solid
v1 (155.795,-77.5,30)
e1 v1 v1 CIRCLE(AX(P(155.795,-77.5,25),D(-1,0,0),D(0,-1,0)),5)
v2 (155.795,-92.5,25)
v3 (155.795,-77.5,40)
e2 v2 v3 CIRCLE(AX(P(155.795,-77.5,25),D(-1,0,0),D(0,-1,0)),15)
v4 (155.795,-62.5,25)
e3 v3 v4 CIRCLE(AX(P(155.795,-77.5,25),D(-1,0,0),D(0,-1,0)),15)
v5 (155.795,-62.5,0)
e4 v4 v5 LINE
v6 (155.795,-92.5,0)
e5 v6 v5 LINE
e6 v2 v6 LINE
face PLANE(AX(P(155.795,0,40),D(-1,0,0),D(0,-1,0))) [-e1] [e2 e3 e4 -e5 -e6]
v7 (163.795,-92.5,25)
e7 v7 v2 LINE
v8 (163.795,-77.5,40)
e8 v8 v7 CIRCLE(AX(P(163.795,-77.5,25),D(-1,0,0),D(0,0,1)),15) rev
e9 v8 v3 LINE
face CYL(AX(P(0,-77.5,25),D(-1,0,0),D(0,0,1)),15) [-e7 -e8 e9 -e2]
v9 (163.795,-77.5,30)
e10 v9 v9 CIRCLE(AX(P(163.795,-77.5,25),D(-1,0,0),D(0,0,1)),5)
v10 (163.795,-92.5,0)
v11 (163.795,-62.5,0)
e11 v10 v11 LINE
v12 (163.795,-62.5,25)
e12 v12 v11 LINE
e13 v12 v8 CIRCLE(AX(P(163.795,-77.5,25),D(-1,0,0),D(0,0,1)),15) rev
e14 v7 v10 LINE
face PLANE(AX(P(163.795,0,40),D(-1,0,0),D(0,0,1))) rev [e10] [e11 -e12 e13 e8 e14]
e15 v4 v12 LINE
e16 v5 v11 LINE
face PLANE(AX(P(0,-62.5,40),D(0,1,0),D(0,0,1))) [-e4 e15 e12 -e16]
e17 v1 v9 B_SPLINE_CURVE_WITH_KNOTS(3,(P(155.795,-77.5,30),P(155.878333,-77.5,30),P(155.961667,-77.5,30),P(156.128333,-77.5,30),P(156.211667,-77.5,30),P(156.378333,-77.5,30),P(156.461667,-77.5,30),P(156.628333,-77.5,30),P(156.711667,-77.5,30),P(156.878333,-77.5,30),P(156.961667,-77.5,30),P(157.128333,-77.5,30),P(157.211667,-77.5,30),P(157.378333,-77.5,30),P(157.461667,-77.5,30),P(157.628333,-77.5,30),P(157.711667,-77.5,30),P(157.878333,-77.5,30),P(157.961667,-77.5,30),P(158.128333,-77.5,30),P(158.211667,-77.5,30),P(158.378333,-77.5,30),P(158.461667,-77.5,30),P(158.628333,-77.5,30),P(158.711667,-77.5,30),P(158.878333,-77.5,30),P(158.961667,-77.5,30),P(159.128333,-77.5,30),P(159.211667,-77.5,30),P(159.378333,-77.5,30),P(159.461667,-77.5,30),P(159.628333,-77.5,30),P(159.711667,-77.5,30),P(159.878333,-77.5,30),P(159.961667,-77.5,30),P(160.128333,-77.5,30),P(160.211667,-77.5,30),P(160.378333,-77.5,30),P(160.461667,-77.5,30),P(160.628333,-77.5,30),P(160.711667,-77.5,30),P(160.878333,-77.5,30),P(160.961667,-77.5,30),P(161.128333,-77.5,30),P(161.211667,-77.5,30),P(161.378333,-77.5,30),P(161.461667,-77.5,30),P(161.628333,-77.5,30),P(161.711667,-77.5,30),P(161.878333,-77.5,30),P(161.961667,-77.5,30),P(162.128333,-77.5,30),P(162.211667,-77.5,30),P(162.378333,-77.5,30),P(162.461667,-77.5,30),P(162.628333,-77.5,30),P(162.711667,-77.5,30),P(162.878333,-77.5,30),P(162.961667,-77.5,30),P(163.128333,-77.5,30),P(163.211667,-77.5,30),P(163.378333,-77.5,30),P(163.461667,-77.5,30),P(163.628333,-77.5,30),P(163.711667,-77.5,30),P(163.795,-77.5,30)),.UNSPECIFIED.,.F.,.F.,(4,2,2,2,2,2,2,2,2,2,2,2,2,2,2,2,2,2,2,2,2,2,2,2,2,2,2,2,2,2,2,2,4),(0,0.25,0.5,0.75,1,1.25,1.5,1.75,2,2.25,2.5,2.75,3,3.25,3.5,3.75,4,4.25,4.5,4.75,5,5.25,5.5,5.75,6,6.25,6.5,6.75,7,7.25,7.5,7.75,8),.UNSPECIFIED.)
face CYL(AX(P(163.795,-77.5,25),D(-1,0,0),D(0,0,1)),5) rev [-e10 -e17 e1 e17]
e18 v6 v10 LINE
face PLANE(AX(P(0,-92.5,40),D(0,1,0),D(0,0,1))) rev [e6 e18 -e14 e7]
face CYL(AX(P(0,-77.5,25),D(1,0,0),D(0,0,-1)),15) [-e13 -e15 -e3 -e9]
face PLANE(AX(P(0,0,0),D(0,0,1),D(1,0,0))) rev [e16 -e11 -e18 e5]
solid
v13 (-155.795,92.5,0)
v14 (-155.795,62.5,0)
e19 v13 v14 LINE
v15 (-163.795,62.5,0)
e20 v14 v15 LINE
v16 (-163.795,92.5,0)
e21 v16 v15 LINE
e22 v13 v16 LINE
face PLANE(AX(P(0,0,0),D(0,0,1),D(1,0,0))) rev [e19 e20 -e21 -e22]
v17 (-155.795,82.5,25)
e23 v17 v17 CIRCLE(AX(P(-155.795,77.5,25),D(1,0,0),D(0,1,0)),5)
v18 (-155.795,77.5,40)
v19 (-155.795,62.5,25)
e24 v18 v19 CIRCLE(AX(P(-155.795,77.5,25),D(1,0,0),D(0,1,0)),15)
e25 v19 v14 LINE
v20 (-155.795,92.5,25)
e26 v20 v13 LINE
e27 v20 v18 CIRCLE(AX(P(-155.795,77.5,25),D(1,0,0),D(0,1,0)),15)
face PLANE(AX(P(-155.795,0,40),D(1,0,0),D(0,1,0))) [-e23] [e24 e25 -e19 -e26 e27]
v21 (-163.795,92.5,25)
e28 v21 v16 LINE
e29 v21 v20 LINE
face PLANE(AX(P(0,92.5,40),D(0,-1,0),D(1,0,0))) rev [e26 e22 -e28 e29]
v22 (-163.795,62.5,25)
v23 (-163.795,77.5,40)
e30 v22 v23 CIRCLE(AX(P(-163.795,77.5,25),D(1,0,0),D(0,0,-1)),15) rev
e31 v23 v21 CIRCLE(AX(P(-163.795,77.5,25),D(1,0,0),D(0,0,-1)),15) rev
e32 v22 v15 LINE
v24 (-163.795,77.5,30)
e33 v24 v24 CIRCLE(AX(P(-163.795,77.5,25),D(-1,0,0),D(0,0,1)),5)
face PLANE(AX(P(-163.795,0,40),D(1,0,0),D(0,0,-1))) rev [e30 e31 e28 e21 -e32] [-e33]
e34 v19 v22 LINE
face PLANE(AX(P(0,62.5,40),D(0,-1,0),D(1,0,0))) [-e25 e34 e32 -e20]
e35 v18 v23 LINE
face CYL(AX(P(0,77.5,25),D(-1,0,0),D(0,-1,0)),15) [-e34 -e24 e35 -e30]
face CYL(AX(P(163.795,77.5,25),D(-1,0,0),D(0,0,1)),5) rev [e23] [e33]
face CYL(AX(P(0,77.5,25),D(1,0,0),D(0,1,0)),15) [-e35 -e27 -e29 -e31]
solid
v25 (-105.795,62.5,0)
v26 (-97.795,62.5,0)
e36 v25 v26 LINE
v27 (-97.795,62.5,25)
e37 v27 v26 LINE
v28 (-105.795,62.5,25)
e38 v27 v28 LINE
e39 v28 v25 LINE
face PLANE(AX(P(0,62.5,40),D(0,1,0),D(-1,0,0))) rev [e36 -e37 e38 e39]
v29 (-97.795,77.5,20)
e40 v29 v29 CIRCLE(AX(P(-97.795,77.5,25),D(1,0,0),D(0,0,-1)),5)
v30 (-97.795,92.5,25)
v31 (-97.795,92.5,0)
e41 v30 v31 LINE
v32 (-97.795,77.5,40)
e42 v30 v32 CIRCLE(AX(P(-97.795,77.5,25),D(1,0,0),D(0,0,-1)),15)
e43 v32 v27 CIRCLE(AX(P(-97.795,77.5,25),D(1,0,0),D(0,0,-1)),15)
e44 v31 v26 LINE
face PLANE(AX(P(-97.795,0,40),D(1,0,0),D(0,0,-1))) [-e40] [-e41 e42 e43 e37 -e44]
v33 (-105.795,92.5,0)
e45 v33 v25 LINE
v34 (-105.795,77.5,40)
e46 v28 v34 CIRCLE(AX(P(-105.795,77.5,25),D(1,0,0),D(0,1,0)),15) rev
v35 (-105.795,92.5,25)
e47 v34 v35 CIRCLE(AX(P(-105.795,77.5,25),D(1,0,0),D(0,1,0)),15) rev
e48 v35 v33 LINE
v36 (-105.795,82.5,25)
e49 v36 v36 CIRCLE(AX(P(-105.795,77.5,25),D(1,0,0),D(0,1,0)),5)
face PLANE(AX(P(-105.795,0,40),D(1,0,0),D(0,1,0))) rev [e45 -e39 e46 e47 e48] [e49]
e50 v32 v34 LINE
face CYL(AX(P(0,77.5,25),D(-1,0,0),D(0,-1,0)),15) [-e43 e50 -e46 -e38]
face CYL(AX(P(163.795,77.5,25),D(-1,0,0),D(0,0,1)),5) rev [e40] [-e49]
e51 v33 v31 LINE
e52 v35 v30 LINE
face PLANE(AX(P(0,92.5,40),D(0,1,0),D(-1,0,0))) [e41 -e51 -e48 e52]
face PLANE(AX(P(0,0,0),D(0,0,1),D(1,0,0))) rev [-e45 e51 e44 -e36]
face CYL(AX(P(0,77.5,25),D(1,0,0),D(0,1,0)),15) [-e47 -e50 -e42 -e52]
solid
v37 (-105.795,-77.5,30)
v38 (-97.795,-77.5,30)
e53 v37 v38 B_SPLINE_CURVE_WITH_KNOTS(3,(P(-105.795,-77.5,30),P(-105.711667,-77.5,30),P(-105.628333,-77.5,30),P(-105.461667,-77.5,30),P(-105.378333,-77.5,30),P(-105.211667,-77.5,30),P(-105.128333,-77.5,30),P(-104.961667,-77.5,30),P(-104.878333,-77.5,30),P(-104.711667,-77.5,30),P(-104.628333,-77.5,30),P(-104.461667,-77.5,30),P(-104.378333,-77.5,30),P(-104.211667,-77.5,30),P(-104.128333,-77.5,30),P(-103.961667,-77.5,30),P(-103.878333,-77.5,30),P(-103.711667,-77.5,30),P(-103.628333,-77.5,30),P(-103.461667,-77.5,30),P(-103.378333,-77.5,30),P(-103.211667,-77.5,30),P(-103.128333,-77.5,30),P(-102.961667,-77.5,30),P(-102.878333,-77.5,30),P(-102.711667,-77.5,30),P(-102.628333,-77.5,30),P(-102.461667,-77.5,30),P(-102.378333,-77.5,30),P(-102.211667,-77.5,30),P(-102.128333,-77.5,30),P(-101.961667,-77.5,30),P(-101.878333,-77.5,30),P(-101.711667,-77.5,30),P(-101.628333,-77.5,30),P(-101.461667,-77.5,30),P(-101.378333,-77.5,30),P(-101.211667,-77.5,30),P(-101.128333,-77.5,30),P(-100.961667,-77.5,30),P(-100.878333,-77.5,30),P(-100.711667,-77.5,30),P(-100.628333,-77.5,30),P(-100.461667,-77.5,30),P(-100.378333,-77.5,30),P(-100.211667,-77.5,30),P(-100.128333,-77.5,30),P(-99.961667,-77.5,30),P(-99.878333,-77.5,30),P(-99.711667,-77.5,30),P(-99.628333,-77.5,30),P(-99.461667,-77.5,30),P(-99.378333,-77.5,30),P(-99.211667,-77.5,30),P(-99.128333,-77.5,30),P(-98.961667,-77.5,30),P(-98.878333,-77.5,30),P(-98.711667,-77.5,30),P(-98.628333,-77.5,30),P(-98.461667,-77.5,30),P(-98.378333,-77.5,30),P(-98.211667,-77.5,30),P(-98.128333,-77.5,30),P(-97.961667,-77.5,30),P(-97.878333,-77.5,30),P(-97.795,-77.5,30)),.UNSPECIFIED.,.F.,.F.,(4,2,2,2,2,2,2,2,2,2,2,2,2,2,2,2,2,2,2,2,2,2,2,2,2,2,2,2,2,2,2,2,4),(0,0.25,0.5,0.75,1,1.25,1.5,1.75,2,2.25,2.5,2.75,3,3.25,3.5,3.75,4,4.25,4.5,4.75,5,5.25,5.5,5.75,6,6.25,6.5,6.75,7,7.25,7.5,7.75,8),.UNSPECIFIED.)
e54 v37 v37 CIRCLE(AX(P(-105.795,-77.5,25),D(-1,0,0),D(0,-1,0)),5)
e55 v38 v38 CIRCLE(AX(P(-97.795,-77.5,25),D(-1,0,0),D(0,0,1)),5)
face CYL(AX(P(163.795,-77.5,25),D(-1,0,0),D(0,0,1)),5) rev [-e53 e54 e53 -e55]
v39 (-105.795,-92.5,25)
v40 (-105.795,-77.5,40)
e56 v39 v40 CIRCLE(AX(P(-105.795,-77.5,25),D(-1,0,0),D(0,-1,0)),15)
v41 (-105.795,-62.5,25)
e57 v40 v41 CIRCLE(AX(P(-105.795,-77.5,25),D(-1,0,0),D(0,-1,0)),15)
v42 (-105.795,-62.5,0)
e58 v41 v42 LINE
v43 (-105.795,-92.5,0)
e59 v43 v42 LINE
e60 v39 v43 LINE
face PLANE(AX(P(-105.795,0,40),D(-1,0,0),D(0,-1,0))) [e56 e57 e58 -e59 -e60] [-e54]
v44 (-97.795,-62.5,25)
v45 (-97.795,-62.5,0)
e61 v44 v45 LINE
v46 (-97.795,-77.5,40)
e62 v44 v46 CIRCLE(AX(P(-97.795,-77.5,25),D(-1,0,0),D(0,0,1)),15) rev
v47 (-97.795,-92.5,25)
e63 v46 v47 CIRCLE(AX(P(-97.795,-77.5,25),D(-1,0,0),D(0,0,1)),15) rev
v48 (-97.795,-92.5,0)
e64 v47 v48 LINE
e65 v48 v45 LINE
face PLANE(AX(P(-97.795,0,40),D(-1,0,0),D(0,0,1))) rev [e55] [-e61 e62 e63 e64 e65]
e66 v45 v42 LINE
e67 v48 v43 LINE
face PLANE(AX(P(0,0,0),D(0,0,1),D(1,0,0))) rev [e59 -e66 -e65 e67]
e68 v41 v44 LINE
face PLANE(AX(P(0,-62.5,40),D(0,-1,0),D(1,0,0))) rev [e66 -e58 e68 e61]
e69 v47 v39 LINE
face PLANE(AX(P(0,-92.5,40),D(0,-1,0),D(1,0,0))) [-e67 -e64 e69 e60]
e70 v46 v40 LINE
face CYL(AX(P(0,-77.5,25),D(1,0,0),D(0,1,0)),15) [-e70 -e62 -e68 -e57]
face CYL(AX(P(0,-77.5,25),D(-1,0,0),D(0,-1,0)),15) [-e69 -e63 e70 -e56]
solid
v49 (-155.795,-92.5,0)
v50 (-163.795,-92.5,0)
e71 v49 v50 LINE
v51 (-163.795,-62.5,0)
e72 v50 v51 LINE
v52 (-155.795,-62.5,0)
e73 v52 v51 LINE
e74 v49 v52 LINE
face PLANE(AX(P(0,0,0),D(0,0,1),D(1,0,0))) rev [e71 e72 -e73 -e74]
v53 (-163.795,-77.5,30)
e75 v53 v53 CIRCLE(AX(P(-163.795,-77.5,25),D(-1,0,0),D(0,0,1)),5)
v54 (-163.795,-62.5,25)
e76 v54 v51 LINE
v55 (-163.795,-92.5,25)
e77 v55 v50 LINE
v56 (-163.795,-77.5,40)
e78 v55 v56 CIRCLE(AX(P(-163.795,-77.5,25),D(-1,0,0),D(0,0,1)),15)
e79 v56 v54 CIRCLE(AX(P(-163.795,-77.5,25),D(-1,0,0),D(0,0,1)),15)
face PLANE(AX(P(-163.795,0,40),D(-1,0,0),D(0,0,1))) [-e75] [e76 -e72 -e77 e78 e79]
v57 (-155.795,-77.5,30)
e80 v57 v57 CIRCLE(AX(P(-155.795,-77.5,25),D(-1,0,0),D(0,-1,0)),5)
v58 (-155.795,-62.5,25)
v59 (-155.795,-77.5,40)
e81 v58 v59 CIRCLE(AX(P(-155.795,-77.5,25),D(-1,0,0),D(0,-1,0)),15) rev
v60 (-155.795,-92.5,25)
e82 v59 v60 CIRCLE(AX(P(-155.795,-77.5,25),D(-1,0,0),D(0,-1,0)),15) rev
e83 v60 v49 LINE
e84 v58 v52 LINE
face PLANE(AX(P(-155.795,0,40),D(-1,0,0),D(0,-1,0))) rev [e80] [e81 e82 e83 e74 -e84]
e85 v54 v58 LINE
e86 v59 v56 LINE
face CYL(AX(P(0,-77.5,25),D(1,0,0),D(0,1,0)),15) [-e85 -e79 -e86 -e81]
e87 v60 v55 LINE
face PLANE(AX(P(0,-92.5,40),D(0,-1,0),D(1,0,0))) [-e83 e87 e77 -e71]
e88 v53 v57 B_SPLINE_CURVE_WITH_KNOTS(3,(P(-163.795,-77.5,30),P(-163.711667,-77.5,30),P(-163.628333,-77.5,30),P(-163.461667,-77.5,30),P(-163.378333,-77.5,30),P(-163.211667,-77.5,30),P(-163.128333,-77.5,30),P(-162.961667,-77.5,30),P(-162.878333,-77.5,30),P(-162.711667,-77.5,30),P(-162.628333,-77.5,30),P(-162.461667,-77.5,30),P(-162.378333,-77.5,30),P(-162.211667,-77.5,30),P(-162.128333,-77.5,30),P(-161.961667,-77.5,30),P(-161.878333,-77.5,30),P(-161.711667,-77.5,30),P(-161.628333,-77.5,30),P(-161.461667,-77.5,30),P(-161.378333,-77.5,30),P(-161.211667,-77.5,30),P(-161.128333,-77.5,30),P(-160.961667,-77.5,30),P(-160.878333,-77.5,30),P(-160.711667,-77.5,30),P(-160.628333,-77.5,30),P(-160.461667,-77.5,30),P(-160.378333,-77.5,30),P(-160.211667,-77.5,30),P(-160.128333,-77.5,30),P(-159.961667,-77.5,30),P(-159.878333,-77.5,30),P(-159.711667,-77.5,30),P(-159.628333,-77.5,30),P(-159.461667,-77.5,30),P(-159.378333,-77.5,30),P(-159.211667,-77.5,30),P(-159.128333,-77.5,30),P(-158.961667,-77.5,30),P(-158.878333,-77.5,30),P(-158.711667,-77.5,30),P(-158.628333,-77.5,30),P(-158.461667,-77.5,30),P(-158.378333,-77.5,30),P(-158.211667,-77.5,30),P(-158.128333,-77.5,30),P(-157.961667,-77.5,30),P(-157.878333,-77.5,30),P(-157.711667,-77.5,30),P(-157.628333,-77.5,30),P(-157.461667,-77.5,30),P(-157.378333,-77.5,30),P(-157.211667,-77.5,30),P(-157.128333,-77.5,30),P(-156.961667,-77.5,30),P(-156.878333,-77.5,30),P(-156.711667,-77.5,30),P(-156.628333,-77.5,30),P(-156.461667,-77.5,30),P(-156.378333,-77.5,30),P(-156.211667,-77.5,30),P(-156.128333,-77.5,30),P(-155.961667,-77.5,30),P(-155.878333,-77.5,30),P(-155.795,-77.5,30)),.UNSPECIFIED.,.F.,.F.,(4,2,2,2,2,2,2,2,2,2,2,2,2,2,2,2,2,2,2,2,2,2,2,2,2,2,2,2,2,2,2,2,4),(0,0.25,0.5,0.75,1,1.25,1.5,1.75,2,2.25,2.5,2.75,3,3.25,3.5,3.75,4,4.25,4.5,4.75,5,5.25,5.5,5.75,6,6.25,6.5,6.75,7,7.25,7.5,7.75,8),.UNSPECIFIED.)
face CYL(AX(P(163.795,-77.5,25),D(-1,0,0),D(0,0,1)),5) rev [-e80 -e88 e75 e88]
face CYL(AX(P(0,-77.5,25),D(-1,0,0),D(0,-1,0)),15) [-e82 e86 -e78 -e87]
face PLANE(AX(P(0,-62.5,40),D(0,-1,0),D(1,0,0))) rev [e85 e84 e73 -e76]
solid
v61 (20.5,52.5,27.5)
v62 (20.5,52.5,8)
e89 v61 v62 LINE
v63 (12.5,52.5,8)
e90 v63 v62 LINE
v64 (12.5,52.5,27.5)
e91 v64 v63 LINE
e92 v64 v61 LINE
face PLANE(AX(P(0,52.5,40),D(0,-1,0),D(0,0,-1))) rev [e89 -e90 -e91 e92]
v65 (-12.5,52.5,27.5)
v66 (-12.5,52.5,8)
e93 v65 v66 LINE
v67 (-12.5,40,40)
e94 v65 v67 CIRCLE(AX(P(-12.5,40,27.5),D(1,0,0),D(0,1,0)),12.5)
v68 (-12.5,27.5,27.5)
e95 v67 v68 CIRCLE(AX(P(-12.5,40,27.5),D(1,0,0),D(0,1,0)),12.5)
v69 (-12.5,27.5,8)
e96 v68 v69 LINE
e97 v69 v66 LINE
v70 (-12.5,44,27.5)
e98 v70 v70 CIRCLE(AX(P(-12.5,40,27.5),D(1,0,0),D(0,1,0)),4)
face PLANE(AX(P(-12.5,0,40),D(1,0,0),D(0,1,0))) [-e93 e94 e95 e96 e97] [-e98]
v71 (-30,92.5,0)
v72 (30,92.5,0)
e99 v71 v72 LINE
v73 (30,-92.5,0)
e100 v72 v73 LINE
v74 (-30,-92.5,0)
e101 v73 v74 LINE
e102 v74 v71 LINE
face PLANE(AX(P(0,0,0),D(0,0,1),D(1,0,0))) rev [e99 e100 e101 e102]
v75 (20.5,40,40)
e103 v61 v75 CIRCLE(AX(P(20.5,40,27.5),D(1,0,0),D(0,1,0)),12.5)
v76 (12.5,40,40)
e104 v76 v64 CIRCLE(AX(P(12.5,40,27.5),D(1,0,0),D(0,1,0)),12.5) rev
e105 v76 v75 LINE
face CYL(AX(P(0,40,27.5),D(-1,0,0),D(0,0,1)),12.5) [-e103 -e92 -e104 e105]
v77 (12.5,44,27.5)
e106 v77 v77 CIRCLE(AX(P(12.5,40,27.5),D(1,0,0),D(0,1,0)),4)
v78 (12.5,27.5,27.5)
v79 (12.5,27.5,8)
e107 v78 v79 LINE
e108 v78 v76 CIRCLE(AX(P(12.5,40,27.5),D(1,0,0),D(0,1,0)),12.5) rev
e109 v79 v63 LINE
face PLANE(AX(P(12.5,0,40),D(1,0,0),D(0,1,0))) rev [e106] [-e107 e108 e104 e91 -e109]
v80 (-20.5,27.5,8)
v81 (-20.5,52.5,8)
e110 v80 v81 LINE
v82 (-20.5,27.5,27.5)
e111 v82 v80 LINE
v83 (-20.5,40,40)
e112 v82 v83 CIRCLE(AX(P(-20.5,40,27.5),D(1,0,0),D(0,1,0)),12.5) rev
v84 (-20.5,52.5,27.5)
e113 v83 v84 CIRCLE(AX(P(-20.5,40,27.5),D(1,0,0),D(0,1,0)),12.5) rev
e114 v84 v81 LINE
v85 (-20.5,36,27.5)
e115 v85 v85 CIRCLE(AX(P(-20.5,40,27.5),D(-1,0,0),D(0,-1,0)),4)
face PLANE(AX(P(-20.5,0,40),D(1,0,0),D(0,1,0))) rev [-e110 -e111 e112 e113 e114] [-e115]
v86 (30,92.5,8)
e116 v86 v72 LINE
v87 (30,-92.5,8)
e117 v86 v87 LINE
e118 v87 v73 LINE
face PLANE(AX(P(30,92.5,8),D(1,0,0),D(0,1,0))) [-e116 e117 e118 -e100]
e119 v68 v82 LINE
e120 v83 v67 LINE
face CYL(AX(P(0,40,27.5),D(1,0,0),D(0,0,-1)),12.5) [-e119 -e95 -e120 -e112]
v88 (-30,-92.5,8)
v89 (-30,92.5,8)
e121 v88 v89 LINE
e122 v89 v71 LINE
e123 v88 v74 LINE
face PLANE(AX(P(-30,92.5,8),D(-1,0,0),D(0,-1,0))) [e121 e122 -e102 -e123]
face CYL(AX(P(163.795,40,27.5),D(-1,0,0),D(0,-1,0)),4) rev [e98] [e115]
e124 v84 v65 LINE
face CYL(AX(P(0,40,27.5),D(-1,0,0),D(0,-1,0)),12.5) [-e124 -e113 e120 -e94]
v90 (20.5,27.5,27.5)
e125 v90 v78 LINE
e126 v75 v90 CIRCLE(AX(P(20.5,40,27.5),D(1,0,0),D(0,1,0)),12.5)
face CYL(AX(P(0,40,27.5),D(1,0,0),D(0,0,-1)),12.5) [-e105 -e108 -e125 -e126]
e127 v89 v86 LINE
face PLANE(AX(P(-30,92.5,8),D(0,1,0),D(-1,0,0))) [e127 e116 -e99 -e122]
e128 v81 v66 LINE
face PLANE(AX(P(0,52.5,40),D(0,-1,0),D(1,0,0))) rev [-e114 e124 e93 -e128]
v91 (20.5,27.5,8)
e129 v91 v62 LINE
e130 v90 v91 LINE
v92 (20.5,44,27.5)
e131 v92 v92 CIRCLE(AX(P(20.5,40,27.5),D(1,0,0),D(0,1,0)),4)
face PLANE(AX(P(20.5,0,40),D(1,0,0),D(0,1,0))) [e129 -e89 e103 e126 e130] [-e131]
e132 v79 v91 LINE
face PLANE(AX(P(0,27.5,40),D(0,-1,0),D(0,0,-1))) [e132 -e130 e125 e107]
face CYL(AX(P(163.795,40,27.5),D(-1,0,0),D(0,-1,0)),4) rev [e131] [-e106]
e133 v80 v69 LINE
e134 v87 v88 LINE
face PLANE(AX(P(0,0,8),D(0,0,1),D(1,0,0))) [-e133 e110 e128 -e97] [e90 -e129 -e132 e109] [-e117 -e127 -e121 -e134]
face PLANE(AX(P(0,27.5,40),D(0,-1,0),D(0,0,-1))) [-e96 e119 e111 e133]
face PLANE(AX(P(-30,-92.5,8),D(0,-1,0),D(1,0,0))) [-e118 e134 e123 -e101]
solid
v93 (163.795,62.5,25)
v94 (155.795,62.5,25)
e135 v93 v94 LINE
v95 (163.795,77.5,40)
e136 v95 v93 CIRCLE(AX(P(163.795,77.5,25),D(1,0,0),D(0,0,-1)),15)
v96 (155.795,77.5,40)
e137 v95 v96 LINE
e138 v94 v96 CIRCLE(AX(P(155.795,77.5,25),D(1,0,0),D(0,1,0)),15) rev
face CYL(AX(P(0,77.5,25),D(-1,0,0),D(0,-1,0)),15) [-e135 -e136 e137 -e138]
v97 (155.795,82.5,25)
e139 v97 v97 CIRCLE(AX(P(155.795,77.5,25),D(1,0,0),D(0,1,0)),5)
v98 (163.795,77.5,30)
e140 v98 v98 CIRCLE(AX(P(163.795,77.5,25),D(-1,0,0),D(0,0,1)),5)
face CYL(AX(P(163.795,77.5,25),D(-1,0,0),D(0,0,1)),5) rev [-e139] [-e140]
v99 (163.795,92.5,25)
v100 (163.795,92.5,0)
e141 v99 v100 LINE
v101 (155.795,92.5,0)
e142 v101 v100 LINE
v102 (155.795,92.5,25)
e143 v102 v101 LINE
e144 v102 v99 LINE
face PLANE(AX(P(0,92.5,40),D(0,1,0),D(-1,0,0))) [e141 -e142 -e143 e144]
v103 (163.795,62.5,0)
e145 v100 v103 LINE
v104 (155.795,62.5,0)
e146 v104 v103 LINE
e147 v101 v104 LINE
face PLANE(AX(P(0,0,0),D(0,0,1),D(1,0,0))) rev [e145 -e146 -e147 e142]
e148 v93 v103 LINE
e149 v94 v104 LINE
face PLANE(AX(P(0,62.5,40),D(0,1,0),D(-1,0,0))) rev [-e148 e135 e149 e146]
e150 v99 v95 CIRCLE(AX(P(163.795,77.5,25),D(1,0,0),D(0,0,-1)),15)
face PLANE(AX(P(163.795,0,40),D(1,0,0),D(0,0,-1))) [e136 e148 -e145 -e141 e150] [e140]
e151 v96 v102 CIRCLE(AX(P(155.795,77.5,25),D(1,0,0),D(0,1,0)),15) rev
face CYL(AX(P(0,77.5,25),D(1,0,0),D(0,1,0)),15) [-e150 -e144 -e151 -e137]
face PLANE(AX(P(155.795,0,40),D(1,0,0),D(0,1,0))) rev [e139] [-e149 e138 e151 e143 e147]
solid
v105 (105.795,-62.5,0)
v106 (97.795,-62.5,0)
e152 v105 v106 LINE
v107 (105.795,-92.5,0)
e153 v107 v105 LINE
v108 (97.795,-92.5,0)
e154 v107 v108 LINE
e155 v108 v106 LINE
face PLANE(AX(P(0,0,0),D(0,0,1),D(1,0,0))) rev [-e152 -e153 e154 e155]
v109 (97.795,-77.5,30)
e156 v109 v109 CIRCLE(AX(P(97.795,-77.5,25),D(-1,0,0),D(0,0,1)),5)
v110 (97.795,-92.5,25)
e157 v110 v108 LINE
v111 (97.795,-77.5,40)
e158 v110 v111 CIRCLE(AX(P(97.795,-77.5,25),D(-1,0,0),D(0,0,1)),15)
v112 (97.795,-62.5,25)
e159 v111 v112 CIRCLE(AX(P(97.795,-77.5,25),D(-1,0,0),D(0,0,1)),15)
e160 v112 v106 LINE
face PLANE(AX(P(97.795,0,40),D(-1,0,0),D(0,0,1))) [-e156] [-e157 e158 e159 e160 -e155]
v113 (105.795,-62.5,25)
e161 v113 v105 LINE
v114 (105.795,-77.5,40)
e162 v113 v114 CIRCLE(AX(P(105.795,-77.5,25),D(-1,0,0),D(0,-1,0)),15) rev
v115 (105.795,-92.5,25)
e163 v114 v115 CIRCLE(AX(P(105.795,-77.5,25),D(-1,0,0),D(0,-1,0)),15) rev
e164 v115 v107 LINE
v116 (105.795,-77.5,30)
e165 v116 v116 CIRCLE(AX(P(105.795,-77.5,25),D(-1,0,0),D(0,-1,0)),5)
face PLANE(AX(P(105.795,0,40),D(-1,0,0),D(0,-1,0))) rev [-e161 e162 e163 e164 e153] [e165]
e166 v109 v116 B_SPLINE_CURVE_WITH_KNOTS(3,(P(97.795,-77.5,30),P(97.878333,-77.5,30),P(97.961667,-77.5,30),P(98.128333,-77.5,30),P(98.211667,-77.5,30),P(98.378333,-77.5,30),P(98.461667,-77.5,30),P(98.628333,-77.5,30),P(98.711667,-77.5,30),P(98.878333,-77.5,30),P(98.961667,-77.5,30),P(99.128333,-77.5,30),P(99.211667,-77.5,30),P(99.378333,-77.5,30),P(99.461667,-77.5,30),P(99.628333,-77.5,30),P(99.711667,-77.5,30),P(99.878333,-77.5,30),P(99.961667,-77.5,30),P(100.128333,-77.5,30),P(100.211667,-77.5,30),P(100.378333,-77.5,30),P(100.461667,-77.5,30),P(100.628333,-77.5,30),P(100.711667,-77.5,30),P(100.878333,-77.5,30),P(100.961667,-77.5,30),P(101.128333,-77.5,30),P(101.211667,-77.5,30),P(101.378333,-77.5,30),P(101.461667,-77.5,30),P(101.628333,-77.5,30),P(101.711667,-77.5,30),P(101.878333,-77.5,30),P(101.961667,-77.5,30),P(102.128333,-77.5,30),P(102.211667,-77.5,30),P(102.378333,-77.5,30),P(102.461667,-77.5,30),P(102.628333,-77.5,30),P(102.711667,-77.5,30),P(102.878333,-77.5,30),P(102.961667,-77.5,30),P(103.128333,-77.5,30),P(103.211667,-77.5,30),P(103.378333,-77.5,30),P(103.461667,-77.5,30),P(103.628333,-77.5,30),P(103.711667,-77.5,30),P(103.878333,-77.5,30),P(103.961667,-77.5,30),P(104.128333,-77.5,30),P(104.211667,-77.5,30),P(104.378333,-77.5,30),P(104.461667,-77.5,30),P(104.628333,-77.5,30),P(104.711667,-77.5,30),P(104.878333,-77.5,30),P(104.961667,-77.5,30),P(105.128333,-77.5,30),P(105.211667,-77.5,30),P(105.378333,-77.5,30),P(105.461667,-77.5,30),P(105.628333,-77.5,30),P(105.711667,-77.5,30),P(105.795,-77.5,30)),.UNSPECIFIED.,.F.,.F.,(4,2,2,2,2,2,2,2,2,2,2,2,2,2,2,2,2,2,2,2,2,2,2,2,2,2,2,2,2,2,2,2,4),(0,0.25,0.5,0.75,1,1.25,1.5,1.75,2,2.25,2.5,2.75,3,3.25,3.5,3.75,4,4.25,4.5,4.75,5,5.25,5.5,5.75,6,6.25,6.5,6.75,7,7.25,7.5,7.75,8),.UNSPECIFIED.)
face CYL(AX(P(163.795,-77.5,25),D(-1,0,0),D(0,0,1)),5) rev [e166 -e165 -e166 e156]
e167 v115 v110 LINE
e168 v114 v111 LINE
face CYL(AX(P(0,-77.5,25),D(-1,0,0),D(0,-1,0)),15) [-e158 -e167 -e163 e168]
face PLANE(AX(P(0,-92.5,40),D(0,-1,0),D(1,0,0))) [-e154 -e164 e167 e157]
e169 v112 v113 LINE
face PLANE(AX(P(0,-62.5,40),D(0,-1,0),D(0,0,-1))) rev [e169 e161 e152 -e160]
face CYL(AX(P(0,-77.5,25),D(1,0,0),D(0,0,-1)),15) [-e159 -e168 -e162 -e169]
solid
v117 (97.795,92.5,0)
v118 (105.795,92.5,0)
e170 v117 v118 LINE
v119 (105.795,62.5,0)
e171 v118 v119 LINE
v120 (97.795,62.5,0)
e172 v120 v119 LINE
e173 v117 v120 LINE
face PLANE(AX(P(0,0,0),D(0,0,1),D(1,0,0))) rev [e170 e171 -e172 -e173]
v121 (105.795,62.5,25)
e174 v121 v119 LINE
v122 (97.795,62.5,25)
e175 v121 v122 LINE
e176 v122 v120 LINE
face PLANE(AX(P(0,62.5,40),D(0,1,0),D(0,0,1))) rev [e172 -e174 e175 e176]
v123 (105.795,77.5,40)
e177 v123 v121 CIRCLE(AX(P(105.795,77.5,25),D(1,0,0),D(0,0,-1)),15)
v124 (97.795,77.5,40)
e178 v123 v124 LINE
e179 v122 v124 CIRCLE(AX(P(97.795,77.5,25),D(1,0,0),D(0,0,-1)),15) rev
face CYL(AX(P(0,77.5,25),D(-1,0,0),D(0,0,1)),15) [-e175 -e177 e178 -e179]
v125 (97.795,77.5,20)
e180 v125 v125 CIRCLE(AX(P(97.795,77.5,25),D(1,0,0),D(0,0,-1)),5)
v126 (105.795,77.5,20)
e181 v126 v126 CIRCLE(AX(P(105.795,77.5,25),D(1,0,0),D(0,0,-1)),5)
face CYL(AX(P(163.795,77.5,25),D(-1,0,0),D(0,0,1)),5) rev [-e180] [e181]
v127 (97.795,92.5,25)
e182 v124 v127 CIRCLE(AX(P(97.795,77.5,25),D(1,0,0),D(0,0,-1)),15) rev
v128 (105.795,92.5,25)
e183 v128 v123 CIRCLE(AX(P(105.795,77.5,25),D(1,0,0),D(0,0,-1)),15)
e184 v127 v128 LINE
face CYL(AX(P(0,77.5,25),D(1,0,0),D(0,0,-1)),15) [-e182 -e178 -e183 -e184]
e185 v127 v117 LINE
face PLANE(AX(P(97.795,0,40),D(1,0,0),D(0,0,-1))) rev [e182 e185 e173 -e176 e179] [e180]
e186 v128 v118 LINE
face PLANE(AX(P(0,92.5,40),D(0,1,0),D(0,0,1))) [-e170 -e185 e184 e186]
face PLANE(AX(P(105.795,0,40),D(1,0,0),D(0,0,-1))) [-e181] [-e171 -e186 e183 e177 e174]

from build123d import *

# Parameters (mm, degrees)
SKETCH1_W             = 8
SKETCH1_H             = 30
BOSS_EXTRUDE1_DEPTH   = 40
BOSS_EXTRUDE1_2_DEPTH = 40
BOSS_EXTRUDE1_3_DEPTH = 40
BOSS_EXTRUDE1_4_DEPTH = 40
BOSS_EXTRUDE1_5_DEPTH = 40
BOSS_EXTRUDE1_6_DEPTH = 40
BOSS_EXTRUDE1_7_DEPTH = 40
BOSS_EXTRUDE1_8_DEPTH = 40
FILLET1_R             = 15
FILLET2_R             = 15
FILLET3_R             = 15
FILLET4_R             = 15
FILLET5_R             = 15
FILLET6_R             = 15
FILLET7_R             = 15
FILLET8_R             = 15
SKETCH4_R             = 5
CUT_EXTRUDE2_DEPTH    = 343.741094851
SKETCH3_R             = 5
CUT_EXTRUDE1_DEPTH    = 343.741094851
SKETCH5_W             = 60
SKETCH5_H             = 185
BOSS_EXTRUDE2_DEPTH   = 8
SKETCH6_W             = 8
SKETCH6_H             = 25
BOSS_EXTRUDE3_DEPTH   = 40
FILLET9_R             = 12.5
SKETCH7_R             = 4
CUT_EXTRUDE3_DEPTH    = 211.049748929


with BuildPart() as part:
    # Sketch1 → Boss-Extrude1 (new body)
    with BuildSketch(Plane.XY):
        with Locations((-159.795, 77.5)):
            Rectangle(SKETCH1_W, SKETCH1_H)
    extrude(amount=BOSS_EXTRUDE1_DEPTH)

    # Fillet1
    fillet1_edges = [part.edges().sort_by_distance(p)[0] for p in [
        (-159.795, 62.5, 40),
        (-159.795, 92.5, 40),
    ]]
    fillet(fillet1_edges, radius=FILLET1_R - 0.0001)  # a hair under: the kernel refuses the full size


with BuildPart() as body_2:
    # Sketch1 → Boss-Extrude1 2 (new body)
    with BuildSketch(Plane.XY):
        with Locations((-101.795, 77.5)):
            Rectangle(SKETCH1_W, SKETCH1_H)
    extrude(amount=BOSS_EXTRUDE1_2_DEPTH)

    # Fillet2
    fillet2_edges = [body_2.edges().sort_by_distance(p)[0] for p in [
        (-101.795, 62.5, 40),
        (-101.795, 92.5, 40),
    ]]
    fillet(fillet2_edges, radius=FILLET2_R - 0.0001)  # a hair under: the kernel refuses the full size


with BuildPart() as body_3:
    # Sketch1 → Boss-Extrude1 3 (new body)
    with BuildSketch(Plane.XY):
        with Locations((101.795, 77.5)):
            Rectangle(SKETCH1_W, SKETCH1_H)
    extrude(amount=BOSS_EXTRUDE1_3_DEPTH)

    # Fillet3
    fillet3_edges = [body_3.edges().sort_by_distance(p)[0] for p in [
        (101.795, 62.5, 40),
        (101.795, 92.5, 40),
    ]]
    fillet(fillet3_edges, radius=FILLET3_R - 0.0001)  # a hair under: the kernel refuses the full size


with BuildPart() as body_4:
    # Sketch1 → Boss-Extrude1 4 (new body)
    with BuildSketch(Plane.XY):
        with Locations((159.795, 77.5)):
            Rectangle(SKETCH1_W, SKETCH1_H)
    extrude(amount=BOSS_EXTRUDE1_4_DEPTH)

    # Fillet4
    fillet4_edges = [body_4.edges().sort_by_distance(p)[0] for p in [
        (159.795, 62.5, 40),
        (159.795, 92.5, 40),
    ]]
    fillet(fillet4_edges, radius=FILLET4_R - 0.0001)  # a hair under: the kernel refuses the full size


with BuildPart() as body_5:
    # Sketch1 → Boss-Extrude1 5 (new body)
    with BuildSketch(Plane.XY):
        with Locations((159.795, -77.5)):
            Rectangle(SKETCH1_W, SKETCH1_H)
    extrude(amount=BOSS_EXTRUDE1_5_DEPTH)

    # Fillet8
    fillet8_edges = [body_5.edges().sort_by_distance(p)[0] for p in [
        (159.795, -92.5, 40),
        (159.795, -62.5, 40),
    ]]
    fillet(fillet8_edges, radius=FILLET8_R - 0.0001)  # a hair under: the kernel refuses the full size


with BuildPart() as body_6:
    # Sketch1 → Boss-Extrude1 6 (new body)
    with BuildSketch(Plane.XY):
        with Locations((101.795, -77.5)):
            Rectangle(SKETCH1_W, SKETCH1_H)
    extrude(amount=BOSS_EXTRUDE1_6_DEPTH)

    # Fillet7
    fillet7_edges = [body_6.edges().sort_by_distance(p)[0] for p in [
        (101.795, -92.5, 40),
        (101.795, -62.5, 40),
    ]]
    fillet(fillet7_edges, radius=FILLET7_R - 0.0001)  # a hair under: the kernel refuses the full size


with BuildPart() as body_7:
    # Sketch1 → Boss-Extrude1 7 (new body)
    with BuildSketch(Plane.XY):
        with Locations((-101.795, -77.5)):
            Rectangle(SKETCH1_W, SKETCH1_H)
    extrude(amount=BOSS_EXTRUDE1_7_DEPTH)

    # Fillet6
    fillet6_edges = [body_7.edges().sort_by_distance(p)[0] for p in [
        (-101.795, -92.5, 40),
        (-101.795, -62.5, 40),
    ]]
    fillet(fillet6_edges, radius=FILLET6_R - 0.0001)  # a hair under: the kernel refuses the full size


with BuildPart() as body_8:
    # Sketch1 → Boss-Extrude1 8 (new body)
    with BuildSketch(Plane.XY):
        with Locations((-159.795, -77.5)):
            Rectangle(SKETCH1_W, SKETCH1_H)
    extrude(amount=BOSS_EXTRUDE1_8_DEPTH)

    # Fillet5
    fillet5_edges = [body_8.edges().sort_by_distance(p)[0] for p in [
        (-159.795, -92.5, 40),
        (-159.795, -62.5, 40),
    ]]
    fillet(fillet5_edges, radius=FILLET5_R - 0.0001)  # a hair under: the kernel refuses the full size


with BuildPart() as cut_extrude2_tool:
    # Sketch4 → Cut-Extrude2 (new, through all)
    with BuildSketch(Plane.ZY.offset(163.795)):
        with Locations((25, -77.5)):
            Circle(SKETCH4_R)
    extrude(amount=-CUT_EXTRUDE2_DEPTH)


with BuildPart() as body_5_1:
    add(body_5.part)

    # Cut-Extrude2: cut by cut_extrude2_tool
    add(cut_extrude2_tool.part, mode=Mode.SUBTRACT)


with BuildPart() as body_6_1:
    add(body_6.part)

    # Cut-Extrude2: cut by cut_extrude2_tool
    add(cut_extrude2_tool.part, mode=Mode.SUBTRACT)


with BuildPart() as body_7_1:
    add(body_7.part)

    # Cut-Extrude2: cut by cut_extrude2_tool
    add(cut_extrude2_tool.part, mode=Mode.SUBTRACT)


with BuildPart() as body_8_1:
    add(body_8.part)

    # Cut-Extrude2: cut by cut_extrude2_tool
    add(cut_extrude2_tool.part, mode=Mode.SUBTRACT)


with BuildPart() as cut_extrude1_tool:
    # Sketch3 → Cut-Extrude1 (new, through all)
    with BuildSketch(Plane.ZY.offset(163.795)):
        with Locations((25, 77.5)):
            Circle(SKETCH3_R)
    extrude(amount=-CUT_EXTRUDE1_DEPTH)


with BuildPart() as part_1:
    add(part.part)

    # Cut-Extrude1: cut by cut_extrude1_tool
    add(cut_extrude1_tool.part, mode=Mode.SUBTRACT)


with BuildPart() as body_2_1:
    add(body_2.part)

    # Cut-Extrude1: cut by cut_extrude1_tool
    add(cut_extrude1_tool.part, mode=Mode.SUBTRACT)


with BuildPart() as body_3_1:
    add(body_3.part)

    # Cut-Extrude1: cut by cut_extrude1_tool
    add(cut_extrude1_tool.part, mode=Mode.SUBTRACT)


with BuildPart() as body_4_1:
    add(body_4.part)

    # Cut-Extrude1: cut by cut_extrude1_tool
    add(cut_extrude1_tool.part, mode=Mode.SUBTRACT)


with BuildPart() as body_9:
    # Sketch5 → Boss-Extrude2 (new body)
    with BuildSketch(Plane(origin=(0, 0, 0), x_dir=(-1, 0, 0), z_dir=(0, 0, -1))):
        Rectangle(SKETCH5_W, SKETCH5_H)
    extrude(amount=-BOSS_EXTRUDE2_DEPTH)

    # Sketch6 → Boss-Extrude3 (add)
    with BuildSketch(Plane(origin=(0, 0, 0), x_dir=(-1, 0, 0), z_dir=(0, 0, -1))):
        with Locations((16.5, 40)):
            Rectangle(SKETCH6_W, SKETCH6_H)
        with Locations((-16.5, 40)):
            Rectangle(SKETCH6_W, SKETCH6_H)
    extrude(amount=-BOSS_EXTRUDE3_DEPTH)

    # Fillet9
    fillet9_edges = [body_9.edges().sort_by_distance(p)[0] for p in [
        (16.5, 52.5, 40),
        (16.5, 27.5, 40),
        (-16.5, 52.5, 40),
        (-16.5, 27.5, 40),
    ]]
    fillet(fillet9_edges, radius=FILLET9_R - 0.0001)  # a hair under: the kernel refuses the full size

    # Sketch7 → Cut-Extrude3 (cut, through all)
    with BuildSketch(Plane.ZY.offset(20.5)):
        with Locations(Location((27.5, 40, 0), (0, 0, 90))):
            Circle(SKETCH7_R)
    extrude(amount=-CUT_EXTRUDE3_DEPTH, mode=Mode.SUBTRACT)


solid = Compound([body_5_1.part, body_6_1.part, body_7_1.part, body_8_1.part, part_1.part, body_2_1.part, body_3_1.part, body_4_1.part, body_9.part])
